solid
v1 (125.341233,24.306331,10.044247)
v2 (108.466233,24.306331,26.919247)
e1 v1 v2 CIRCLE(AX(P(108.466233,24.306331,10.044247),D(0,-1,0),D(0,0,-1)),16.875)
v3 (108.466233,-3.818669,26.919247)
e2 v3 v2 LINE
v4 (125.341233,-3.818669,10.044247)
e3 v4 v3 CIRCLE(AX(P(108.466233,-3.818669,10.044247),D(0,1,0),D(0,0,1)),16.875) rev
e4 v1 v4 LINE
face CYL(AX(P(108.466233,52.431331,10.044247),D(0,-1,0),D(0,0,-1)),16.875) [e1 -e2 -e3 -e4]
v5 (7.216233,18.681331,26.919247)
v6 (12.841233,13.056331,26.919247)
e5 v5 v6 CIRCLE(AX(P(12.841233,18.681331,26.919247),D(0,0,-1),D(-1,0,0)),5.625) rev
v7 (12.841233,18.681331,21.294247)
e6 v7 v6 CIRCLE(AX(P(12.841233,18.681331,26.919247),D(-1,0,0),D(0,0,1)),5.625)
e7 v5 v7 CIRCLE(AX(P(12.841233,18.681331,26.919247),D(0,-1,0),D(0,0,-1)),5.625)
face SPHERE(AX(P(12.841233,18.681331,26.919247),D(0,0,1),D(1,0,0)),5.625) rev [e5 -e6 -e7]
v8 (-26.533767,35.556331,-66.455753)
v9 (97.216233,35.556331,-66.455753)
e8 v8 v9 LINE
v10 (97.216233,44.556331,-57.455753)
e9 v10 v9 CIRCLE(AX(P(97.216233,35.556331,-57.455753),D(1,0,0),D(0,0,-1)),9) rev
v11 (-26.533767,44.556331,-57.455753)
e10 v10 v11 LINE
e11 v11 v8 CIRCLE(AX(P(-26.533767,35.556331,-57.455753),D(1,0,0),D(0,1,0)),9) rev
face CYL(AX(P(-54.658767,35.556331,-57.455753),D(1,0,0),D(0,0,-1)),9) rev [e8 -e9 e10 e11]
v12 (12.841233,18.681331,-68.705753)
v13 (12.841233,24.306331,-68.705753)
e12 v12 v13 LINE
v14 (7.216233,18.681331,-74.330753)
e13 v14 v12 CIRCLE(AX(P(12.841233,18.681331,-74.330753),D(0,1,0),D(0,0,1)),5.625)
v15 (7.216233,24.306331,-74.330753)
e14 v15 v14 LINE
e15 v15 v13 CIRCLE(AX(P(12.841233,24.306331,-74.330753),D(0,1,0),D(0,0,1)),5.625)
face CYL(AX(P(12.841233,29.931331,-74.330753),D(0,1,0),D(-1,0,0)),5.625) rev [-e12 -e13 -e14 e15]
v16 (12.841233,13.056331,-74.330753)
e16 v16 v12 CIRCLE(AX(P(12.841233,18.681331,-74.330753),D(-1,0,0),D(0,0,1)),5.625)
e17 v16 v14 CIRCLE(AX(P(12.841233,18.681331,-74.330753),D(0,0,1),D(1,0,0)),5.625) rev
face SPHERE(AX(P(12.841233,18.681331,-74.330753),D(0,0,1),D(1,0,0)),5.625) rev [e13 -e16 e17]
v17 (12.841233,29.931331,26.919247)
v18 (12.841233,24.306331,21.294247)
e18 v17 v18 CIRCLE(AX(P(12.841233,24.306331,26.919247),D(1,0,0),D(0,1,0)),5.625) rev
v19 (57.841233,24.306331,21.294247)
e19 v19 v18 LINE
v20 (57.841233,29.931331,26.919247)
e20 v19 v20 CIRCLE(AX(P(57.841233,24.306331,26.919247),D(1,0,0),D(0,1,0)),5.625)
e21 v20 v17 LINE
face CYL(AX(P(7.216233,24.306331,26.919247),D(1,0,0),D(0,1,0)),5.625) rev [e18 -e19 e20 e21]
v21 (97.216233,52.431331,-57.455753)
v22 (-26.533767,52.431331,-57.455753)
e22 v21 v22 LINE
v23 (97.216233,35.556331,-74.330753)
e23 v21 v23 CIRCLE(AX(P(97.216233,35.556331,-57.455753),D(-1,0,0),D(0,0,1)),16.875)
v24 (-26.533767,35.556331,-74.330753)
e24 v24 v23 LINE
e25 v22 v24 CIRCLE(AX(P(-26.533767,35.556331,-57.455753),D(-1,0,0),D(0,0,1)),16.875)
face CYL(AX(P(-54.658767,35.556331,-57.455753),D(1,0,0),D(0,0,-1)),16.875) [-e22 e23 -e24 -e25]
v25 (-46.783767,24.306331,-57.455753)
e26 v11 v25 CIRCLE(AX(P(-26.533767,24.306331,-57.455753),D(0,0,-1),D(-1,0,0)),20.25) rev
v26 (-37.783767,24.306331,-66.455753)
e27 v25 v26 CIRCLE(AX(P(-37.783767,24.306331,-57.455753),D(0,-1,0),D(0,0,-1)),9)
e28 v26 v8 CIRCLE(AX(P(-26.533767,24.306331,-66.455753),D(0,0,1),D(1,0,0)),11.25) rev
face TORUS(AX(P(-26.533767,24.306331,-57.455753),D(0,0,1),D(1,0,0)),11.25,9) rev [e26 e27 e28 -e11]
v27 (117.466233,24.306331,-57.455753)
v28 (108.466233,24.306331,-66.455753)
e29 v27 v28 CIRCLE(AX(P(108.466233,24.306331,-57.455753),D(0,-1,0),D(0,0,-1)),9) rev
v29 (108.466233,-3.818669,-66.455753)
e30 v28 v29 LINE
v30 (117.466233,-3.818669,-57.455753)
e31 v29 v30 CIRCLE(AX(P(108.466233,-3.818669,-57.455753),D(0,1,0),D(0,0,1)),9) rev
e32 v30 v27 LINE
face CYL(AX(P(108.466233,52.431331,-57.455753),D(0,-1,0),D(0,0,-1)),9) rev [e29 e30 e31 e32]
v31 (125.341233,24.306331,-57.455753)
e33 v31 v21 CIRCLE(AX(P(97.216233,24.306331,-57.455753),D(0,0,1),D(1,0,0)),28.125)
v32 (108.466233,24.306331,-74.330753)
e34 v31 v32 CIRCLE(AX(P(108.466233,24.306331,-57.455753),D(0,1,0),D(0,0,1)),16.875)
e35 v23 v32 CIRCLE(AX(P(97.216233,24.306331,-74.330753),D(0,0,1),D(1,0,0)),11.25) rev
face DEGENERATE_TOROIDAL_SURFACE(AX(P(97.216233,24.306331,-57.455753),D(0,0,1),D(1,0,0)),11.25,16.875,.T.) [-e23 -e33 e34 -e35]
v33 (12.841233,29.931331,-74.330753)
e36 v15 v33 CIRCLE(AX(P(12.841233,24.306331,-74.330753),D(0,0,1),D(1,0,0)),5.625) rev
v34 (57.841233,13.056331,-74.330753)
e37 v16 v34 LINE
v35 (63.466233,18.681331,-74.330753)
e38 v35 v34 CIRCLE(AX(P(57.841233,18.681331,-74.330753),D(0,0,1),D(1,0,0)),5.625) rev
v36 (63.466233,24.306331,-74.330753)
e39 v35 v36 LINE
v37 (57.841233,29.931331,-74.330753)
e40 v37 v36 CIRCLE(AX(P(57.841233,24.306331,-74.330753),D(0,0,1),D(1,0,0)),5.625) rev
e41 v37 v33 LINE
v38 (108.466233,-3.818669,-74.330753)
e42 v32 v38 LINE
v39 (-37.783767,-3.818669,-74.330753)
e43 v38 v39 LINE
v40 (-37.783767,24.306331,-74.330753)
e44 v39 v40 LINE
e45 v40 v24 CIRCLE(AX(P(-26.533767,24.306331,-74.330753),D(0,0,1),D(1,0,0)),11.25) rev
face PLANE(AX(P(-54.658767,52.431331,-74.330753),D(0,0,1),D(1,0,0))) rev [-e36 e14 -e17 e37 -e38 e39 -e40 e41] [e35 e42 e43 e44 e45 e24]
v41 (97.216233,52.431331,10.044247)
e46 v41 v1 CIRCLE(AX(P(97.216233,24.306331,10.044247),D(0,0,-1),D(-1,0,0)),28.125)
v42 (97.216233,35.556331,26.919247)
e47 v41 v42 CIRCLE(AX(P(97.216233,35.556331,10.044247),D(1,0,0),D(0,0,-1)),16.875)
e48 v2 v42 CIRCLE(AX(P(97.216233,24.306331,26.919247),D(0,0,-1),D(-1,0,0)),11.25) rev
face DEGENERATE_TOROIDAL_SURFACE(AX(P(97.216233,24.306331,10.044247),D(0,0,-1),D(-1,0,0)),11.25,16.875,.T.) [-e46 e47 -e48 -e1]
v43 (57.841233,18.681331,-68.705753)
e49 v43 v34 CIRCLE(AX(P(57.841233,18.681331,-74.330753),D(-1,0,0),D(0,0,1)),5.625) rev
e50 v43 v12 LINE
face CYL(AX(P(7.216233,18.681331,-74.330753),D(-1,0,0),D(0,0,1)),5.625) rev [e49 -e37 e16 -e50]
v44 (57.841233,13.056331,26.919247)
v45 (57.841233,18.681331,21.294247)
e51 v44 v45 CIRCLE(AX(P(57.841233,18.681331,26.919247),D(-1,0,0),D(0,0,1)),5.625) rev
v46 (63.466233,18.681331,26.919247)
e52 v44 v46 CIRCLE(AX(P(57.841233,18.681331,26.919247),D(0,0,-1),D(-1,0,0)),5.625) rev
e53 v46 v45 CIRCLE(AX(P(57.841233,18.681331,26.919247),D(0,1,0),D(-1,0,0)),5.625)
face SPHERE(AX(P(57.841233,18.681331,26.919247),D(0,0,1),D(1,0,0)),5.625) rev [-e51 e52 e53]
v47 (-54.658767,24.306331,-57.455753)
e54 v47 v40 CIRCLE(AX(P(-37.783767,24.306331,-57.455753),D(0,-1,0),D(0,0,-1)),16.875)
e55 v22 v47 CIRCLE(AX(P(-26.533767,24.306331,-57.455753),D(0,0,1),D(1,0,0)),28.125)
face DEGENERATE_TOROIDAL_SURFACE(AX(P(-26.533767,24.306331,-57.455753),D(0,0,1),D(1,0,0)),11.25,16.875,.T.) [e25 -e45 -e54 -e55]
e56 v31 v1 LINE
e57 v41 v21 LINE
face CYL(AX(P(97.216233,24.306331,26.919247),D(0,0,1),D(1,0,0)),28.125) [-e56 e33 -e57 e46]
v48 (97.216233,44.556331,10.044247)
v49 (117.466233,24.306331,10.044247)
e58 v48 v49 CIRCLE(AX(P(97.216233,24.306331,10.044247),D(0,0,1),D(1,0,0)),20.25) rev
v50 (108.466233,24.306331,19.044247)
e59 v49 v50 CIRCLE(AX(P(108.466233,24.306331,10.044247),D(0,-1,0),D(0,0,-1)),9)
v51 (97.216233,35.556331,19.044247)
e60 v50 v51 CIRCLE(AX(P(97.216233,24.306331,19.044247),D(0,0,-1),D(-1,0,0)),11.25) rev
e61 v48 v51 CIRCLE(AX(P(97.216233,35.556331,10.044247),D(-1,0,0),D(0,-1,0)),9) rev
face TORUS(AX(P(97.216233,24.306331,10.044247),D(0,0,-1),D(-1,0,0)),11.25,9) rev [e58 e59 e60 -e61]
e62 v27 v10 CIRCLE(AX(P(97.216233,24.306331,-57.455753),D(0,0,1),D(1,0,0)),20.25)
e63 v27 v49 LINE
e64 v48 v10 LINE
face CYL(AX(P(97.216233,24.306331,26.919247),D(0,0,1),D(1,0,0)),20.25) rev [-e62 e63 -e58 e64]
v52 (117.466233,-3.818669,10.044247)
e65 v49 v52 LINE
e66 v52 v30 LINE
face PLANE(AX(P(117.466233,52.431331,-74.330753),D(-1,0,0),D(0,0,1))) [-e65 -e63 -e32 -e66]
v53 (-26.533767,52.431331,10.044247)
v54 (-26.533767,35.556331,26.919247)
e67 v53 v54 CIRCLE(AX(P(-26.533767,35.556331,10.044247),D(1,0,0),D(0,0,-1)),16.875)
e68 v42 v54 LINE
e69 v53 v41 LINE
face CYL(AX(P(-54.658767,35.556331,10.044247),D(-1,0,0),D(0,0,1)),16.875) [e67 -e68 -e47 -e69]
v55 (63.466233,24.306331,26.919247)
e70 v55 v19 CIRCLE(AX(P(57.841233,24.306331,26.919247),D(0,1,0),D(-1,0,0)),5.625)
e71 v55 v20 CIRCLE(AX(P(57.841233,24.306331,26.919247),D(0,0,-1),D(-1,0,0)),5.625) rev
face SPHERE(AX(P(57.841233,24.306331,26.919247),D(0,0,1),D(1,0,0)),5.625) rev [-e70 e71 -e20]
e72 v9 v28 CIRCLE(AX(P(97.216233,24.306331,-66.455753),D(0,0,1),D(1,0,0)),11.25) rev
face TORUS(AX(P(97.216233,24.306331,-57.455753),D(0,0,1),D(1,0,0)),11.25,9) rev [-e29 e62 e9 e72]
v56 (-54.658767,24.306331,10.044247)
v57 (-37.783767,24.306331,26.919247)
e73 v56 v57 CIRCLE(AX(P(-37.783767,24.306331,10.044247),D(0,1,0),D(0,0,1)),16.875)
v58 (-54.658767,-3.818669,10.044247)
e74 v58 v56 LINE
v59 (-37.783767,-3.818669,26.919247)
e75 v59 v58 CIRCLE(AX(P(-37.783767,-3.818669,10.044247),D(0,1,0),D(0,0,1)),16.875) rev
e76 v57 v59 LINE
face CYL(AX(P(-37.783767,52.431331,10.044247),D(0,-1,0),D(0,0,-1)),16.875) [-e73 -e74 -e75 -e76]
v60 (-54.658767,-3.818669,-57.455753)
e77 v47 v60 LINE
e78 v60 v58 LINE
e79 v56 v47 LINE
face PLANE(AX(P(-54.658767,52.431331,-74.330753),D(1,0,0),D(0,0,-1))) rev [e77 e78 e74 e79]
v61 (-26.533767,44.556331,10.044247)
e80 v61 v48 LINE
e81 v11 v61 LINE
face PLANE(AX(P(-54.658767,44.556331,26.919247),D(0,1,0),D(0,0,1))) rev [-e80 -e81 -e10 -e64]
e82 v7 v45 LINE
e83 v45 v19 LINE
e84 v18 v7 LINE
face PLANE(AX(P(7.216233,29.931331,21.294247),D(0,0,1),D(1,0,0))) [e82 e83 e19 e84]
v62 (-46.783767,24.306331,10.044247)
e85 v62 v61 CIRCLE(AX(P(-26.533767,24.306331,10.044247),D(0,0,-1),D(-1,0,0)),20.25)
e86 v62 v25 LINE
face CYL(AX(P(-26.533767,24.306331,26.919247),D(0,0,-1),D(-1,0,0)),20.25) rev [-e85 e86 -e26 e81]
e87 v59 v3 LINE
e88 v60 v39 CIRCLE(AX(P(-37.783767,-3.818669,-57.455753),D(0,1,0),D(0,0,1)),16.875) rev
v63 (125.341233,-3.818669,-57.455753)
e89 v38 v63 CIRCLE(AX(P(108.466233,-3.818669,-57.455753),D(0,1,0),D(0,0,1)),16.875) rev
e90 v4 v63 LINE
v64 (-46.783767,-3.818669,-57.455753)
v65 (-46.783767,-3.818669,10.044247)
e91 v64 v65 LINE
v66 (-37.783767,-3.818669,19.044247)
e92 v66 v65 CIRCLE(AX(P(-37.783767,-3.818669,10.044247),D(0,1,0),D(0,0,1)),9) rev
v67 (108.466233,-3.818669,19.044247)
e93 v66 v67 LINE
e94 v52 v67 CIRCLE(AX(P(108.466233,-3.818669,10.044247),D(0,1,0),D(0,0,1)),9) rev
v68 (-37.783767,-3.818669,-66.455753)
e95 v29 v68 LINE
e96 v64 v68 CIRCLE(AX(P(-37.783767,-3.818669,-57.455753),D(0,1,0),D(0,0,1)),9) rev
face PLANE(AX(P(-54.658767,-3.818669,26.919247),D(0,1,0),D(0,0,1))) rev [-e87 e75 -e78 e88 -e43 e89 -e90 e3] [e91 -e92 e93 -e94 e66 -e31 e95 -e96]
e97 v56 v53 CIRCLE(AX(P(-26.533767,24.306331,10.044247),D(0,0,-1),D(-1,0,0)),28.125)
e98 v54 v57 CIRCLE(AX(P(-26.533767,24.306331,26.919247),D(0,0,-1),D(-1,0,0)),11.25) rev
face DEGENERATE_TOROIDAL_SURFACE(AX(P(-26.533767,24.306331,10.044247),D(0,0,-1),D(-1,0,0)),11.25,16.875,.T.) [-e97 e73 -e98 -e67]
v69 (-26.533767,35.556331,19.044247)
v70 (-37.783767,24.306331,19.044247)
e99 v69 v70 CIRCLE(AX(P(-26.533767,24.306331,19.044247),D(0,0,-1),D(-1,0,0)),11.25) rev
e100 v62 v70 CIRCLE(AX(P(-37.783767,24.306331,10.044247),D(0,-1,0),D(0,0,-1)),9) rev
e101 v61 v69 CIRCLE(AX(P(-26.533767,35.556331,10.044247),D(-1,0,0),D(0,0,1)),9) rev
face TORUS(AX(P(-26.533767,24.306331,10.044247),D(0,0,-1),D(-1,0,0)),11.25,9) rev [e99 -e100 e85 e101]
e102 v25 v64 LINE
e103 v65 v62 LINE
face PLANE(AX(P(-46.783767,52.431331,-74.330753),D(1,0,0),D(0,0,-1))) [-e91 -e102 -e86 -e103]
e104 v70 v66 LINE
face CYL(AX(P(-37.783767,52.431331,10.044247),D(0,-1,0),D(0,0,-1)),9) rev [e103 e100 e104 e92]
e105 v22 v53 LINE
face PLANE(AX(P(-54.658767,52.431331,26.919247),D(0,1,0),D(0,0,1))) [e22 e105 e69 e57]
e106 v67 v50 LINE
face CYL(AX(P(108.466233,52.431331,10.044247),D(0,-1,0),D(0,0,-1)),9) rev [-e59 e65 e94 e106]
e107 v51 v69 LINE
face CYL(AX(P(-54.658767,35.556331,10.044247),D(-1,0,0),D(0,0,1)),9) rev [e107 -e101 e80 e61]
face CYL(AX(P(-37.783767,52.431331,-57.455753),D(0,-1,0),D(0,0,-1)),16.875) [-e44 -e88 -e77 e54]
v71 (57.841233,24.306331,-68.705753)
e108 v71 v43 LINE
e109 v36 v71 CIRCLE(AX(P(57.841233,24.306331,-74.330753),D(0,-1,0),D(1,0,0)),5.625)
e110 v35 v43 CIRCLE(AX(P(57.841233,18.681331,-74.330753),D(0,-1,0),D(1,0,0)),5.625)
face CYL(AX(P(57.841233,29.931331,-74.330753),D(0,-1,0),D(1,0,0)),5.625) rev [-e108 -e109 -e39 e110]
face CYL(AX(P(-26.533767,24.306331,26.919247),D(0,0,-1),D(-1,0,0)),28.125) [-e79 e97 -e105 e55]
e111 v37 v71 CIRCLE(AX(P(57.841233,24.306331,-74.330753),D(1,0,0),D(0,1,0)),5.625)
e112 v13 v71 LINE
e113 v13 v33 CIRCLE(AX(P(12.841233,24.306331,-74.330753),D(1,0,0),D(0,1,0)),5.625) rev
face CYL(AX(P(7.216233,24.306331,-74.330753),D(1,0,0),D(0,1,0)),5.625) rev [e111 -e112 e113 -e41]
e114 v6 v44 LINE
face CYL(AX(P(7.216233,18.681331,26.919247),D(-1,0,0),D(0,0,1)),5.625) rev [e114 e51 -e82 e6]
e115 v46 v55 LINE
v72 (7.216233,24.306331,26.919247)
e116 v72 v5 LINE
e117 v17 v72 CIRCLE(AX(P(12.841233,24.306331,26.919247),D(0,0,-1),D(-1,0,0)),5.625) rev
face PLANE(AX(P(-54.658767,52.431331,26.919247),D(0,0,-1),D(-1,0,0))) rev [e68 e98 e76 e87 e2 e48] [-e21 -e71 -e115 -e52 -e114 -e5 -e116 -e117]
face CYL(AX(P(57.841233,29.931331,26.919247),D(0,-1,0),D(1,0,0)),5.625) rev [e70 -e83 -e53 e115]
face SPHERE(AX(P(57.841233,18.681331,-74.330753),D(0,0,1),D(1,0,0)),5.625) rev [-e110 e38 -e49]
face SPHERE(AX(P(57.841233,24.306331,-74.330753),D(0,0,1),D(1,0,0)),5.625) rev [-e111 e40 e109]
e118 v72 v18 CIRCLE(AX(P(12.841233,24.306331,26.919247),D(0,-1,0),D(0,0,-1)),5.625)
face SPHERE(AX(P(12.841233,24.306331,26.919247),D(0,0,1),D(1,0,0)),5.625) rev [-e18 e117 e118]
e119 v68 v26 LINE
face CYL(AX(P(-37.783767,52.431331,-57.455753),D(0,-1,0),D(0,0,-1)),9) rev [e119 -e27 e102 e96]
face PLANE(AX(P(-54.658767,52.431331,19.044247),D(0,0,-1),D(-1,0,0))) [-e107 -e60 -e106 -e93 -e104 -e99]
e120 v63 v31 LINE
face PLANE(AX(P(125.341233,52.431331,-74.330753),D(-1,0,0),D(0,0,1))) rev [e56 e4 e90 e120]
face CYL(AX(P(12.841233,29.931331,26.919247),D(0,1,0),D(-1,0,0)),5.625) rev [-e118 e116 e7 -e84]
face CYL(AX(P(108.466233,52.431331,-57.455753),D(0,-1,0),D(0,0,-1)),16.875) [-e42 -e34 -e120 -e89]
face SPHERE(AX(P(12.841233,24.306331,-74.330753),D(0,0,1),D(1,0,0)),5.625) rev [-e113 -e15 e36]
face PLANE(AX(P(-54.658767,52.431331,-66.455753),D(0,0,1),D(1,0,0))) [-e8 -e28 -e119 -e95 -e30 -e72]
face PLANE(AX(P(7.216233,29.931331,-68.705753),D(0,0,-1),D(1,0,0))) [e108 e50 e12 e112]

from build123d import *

# Parameters (mm, degrees)
ESQUISSE1_W             = 160
ESQUISSE1_H             = 90
EXTRUSION1_DEPTH        = 50
CONG_1_R                = 25
CONG_2_R                = 15
COQUE1_T                = -7
ESQUISSE2_W             = 50
ESQUISSE2_H             = 15
ENL_V_MAT_EXTRU_1_DEPTH = 5
CONG_4_R                = 5
CONG_5_R                = 5
CONG_6_R                = 5
CONG_7_R                = 5
CONG_4_OF_SYM_TRIE1_R   = 5
CONG_5_OF_SYM_TRIE1_R   = 5
CONG_6_OF_SYM_TRIE1_R   = 5
CONG_7_OF_SYM_TRIE1_R   = 5
ECHELLE1_SCALE          = 1.125


with BuildPart() as part:
    # Esquisse1 → Extrusion1 (new body)
    with BuildSketch(Plane(origin=(0, 0, 0), x_dir=(1, 0, 0), z_dir=(0, 1, 0))):
        with Locations((35.341232877, 23.705753425)):
            Rectangle(ESQUISSE1_W, ESQUISSE1_H)
    extrude(amount=EXTRUSION1_DEPTH)

    # Congé1
    cong_1_edges = [part.edges().sort_by_distance(p)[0] for p in [
        (115.341232877, 50, -23.705753425),
        (-44.658767123, 50, -23.705753425),
    ]]
    fillet(cong_1_edges, radius=CONG_1_R)

    # Congé2
    cong_2_edges = [part.edges().sort_by_distance(p)[0] for p in [
        (35.341232877, 50, 21.294246575),
        (35.341232877, 50, -68.705753425),
        (115.341232877, 12.5, 21.294246575),
        (-44.658767123, 12.5, 21.294246575),
        (108.018902406, 42.67766953, 21.294246575),
        (-37.336436653, 42.67766953, 21.294246575),
        (-44.658767123, 12.5, -68.705753425),
        (115.341232877, 12.5, -68.705753425),
        (108.018902406, 42.67766953, -68.705753425),
        (-37.336436653, 42.67766953, -68.705753425),
    ]]
    fillet(cong_2_edges, radius=CONG_2_R)

    # Coque1
    coque1_openings = [part.faces().sort_by_distance(p)[0] for p in [
        (35.341232877, 0, -23.705753425),
    ]]
    offset(amount=COQUE1_T, openings=coque1_openings, kind=Kind.INTERSECTION)

    # Esquisse2 → Enlèv. mat.-Extru.1 (cut)
    with BuildSketch(Plane.XY.offset(21.294246575)):
        with Locations((35.341232877, 22.5)):
            Rectangle(ESQUISSE2_W, ESQUISSE2_H)
    enl_v_mat_extru_1 = extrude(amount=-ENL_V_MAT_EXTRU_1_DEPTH, mode=Mode.SUBTRACT)

    # Congé4
    cong_4_edges = [part.edges().sort_by_distance(p)[0] for p in [
        (35.341232877, 15, 16.294246575),
    ]]
    fillet(cong_4_edges, radius=CONG_4_R - 0.0001)  # a hair under: the kernel refuses the full size

    # Congé5
    cong_5_edges = [part.edges().sort_by_distance(p)[0] for p in [
        (35.341232877, 30, 16.294246575),
    ]]
    fillet(cong_5_edges, radius=CONG_5_R - 0.0001)  # a hair under: the kernel refuses the full size

    # Congé6
    cong_6_edges = [part.edges().sort_by_distance(p)[0] for p in [
        (10.341232877, 16.464436805, 17.75868338),
        (10.341232877, 22.5, 16.294246575),
        (10.341232877, 28.535563195, 17.75868338),
    ]]
    fillet(cong_6_edges, radius=CONG_6_R - 0.0001)  # a hair under: the kernel refuses the full size

    # Congé7
    cong_7_edges = [part.edges().sort_by_distance(p)[0] for p in [
        (60.341232877, 22.5, 16.294246575),
        (60.341232877, 16.464436805, 17.75868338),
        (60.341232877, 28.535563195, 17.75868338),
    ]]
    fillet(cong_7_edges, radius=CONG_7_R - 0.0001)  # a hair under: the kernel refuses the full size

    # Symétrie1: Enlèv. mat.-Extru.1 across plane
    add(enl_v_mat_extru_1.mirror(Plane.XY.offset(-23.705753425)), mode=Mode.SUBTRACT)

    # Congé4 of Symétrie1
    cong_4_of_sym_trie1_edges = [part.edges().sort_by_distance(p)[0] for p in [
        (35.341232877, 15, -63.705753425),
    ]]
    fillet(cong_4_of_sym_trie1_edges, radius=CONG_4_OF_SYM_TRIE1_R - 0.0001)  # a hair under: the kernel refuses the full size

    # Congé5 of Symétrie1
    cong_5_of_sym_trie1_edges = [part.edges().sort_by_distance(p)[0] for p in [
        (35.341232877, 30, -63.705753425),
    ]]
    fillet(cong_5_of_sym_trie1_edges, radius=CONG_5_OF_SYM_TRIE1_R - 0.0001)  # a hair under: the kernel refuses the full size

    # Congé6 of Symétrie1
    cong_6_of_sym_trie1_edges = [part.edges().sort_by_distance(p)[0] for p in [
        (10.341232877, 16.464436805, -65.170190229),
        (10.341232877, 22.5, -63.705753425),
        (10.341232877, 28.535563195, -65.170190229),
    ]]
    fillet(cong_6_of_sym_trie1_edges, radius=CONG_6_OF_SYM_TRIE1_R - 0.0001)  # a hair under: the kernel refuses the full size

    # Congé7 of Symétrie1
    cong_7_of_sym_trie1_edges = [part.edges().sort_by_distance(p)[0] for p in [
        (60.341232877, 22.5, -63.705753425),
        (60.341232877, 16.464436805, -65.170190229),
        (60.341232877, 28.535563195, -65.170190229),
    ]]
    fillet(cong_7_of_sym_trie1_edges, radius=CONG_7_OF_SYM_TRIE1_R - 0.0001)  # a hair under: the kernel refuses the full size


with BuildPart() as part_1:
    # Echelle1: scaled about (35.341232877, 30.549354713, -23.705753425)
    add(part.part.scale(ECHELLE1_SCALE).moved(Location((-4.41765411, -3.818669339, 2.963219178))))


solid = part_1.part
